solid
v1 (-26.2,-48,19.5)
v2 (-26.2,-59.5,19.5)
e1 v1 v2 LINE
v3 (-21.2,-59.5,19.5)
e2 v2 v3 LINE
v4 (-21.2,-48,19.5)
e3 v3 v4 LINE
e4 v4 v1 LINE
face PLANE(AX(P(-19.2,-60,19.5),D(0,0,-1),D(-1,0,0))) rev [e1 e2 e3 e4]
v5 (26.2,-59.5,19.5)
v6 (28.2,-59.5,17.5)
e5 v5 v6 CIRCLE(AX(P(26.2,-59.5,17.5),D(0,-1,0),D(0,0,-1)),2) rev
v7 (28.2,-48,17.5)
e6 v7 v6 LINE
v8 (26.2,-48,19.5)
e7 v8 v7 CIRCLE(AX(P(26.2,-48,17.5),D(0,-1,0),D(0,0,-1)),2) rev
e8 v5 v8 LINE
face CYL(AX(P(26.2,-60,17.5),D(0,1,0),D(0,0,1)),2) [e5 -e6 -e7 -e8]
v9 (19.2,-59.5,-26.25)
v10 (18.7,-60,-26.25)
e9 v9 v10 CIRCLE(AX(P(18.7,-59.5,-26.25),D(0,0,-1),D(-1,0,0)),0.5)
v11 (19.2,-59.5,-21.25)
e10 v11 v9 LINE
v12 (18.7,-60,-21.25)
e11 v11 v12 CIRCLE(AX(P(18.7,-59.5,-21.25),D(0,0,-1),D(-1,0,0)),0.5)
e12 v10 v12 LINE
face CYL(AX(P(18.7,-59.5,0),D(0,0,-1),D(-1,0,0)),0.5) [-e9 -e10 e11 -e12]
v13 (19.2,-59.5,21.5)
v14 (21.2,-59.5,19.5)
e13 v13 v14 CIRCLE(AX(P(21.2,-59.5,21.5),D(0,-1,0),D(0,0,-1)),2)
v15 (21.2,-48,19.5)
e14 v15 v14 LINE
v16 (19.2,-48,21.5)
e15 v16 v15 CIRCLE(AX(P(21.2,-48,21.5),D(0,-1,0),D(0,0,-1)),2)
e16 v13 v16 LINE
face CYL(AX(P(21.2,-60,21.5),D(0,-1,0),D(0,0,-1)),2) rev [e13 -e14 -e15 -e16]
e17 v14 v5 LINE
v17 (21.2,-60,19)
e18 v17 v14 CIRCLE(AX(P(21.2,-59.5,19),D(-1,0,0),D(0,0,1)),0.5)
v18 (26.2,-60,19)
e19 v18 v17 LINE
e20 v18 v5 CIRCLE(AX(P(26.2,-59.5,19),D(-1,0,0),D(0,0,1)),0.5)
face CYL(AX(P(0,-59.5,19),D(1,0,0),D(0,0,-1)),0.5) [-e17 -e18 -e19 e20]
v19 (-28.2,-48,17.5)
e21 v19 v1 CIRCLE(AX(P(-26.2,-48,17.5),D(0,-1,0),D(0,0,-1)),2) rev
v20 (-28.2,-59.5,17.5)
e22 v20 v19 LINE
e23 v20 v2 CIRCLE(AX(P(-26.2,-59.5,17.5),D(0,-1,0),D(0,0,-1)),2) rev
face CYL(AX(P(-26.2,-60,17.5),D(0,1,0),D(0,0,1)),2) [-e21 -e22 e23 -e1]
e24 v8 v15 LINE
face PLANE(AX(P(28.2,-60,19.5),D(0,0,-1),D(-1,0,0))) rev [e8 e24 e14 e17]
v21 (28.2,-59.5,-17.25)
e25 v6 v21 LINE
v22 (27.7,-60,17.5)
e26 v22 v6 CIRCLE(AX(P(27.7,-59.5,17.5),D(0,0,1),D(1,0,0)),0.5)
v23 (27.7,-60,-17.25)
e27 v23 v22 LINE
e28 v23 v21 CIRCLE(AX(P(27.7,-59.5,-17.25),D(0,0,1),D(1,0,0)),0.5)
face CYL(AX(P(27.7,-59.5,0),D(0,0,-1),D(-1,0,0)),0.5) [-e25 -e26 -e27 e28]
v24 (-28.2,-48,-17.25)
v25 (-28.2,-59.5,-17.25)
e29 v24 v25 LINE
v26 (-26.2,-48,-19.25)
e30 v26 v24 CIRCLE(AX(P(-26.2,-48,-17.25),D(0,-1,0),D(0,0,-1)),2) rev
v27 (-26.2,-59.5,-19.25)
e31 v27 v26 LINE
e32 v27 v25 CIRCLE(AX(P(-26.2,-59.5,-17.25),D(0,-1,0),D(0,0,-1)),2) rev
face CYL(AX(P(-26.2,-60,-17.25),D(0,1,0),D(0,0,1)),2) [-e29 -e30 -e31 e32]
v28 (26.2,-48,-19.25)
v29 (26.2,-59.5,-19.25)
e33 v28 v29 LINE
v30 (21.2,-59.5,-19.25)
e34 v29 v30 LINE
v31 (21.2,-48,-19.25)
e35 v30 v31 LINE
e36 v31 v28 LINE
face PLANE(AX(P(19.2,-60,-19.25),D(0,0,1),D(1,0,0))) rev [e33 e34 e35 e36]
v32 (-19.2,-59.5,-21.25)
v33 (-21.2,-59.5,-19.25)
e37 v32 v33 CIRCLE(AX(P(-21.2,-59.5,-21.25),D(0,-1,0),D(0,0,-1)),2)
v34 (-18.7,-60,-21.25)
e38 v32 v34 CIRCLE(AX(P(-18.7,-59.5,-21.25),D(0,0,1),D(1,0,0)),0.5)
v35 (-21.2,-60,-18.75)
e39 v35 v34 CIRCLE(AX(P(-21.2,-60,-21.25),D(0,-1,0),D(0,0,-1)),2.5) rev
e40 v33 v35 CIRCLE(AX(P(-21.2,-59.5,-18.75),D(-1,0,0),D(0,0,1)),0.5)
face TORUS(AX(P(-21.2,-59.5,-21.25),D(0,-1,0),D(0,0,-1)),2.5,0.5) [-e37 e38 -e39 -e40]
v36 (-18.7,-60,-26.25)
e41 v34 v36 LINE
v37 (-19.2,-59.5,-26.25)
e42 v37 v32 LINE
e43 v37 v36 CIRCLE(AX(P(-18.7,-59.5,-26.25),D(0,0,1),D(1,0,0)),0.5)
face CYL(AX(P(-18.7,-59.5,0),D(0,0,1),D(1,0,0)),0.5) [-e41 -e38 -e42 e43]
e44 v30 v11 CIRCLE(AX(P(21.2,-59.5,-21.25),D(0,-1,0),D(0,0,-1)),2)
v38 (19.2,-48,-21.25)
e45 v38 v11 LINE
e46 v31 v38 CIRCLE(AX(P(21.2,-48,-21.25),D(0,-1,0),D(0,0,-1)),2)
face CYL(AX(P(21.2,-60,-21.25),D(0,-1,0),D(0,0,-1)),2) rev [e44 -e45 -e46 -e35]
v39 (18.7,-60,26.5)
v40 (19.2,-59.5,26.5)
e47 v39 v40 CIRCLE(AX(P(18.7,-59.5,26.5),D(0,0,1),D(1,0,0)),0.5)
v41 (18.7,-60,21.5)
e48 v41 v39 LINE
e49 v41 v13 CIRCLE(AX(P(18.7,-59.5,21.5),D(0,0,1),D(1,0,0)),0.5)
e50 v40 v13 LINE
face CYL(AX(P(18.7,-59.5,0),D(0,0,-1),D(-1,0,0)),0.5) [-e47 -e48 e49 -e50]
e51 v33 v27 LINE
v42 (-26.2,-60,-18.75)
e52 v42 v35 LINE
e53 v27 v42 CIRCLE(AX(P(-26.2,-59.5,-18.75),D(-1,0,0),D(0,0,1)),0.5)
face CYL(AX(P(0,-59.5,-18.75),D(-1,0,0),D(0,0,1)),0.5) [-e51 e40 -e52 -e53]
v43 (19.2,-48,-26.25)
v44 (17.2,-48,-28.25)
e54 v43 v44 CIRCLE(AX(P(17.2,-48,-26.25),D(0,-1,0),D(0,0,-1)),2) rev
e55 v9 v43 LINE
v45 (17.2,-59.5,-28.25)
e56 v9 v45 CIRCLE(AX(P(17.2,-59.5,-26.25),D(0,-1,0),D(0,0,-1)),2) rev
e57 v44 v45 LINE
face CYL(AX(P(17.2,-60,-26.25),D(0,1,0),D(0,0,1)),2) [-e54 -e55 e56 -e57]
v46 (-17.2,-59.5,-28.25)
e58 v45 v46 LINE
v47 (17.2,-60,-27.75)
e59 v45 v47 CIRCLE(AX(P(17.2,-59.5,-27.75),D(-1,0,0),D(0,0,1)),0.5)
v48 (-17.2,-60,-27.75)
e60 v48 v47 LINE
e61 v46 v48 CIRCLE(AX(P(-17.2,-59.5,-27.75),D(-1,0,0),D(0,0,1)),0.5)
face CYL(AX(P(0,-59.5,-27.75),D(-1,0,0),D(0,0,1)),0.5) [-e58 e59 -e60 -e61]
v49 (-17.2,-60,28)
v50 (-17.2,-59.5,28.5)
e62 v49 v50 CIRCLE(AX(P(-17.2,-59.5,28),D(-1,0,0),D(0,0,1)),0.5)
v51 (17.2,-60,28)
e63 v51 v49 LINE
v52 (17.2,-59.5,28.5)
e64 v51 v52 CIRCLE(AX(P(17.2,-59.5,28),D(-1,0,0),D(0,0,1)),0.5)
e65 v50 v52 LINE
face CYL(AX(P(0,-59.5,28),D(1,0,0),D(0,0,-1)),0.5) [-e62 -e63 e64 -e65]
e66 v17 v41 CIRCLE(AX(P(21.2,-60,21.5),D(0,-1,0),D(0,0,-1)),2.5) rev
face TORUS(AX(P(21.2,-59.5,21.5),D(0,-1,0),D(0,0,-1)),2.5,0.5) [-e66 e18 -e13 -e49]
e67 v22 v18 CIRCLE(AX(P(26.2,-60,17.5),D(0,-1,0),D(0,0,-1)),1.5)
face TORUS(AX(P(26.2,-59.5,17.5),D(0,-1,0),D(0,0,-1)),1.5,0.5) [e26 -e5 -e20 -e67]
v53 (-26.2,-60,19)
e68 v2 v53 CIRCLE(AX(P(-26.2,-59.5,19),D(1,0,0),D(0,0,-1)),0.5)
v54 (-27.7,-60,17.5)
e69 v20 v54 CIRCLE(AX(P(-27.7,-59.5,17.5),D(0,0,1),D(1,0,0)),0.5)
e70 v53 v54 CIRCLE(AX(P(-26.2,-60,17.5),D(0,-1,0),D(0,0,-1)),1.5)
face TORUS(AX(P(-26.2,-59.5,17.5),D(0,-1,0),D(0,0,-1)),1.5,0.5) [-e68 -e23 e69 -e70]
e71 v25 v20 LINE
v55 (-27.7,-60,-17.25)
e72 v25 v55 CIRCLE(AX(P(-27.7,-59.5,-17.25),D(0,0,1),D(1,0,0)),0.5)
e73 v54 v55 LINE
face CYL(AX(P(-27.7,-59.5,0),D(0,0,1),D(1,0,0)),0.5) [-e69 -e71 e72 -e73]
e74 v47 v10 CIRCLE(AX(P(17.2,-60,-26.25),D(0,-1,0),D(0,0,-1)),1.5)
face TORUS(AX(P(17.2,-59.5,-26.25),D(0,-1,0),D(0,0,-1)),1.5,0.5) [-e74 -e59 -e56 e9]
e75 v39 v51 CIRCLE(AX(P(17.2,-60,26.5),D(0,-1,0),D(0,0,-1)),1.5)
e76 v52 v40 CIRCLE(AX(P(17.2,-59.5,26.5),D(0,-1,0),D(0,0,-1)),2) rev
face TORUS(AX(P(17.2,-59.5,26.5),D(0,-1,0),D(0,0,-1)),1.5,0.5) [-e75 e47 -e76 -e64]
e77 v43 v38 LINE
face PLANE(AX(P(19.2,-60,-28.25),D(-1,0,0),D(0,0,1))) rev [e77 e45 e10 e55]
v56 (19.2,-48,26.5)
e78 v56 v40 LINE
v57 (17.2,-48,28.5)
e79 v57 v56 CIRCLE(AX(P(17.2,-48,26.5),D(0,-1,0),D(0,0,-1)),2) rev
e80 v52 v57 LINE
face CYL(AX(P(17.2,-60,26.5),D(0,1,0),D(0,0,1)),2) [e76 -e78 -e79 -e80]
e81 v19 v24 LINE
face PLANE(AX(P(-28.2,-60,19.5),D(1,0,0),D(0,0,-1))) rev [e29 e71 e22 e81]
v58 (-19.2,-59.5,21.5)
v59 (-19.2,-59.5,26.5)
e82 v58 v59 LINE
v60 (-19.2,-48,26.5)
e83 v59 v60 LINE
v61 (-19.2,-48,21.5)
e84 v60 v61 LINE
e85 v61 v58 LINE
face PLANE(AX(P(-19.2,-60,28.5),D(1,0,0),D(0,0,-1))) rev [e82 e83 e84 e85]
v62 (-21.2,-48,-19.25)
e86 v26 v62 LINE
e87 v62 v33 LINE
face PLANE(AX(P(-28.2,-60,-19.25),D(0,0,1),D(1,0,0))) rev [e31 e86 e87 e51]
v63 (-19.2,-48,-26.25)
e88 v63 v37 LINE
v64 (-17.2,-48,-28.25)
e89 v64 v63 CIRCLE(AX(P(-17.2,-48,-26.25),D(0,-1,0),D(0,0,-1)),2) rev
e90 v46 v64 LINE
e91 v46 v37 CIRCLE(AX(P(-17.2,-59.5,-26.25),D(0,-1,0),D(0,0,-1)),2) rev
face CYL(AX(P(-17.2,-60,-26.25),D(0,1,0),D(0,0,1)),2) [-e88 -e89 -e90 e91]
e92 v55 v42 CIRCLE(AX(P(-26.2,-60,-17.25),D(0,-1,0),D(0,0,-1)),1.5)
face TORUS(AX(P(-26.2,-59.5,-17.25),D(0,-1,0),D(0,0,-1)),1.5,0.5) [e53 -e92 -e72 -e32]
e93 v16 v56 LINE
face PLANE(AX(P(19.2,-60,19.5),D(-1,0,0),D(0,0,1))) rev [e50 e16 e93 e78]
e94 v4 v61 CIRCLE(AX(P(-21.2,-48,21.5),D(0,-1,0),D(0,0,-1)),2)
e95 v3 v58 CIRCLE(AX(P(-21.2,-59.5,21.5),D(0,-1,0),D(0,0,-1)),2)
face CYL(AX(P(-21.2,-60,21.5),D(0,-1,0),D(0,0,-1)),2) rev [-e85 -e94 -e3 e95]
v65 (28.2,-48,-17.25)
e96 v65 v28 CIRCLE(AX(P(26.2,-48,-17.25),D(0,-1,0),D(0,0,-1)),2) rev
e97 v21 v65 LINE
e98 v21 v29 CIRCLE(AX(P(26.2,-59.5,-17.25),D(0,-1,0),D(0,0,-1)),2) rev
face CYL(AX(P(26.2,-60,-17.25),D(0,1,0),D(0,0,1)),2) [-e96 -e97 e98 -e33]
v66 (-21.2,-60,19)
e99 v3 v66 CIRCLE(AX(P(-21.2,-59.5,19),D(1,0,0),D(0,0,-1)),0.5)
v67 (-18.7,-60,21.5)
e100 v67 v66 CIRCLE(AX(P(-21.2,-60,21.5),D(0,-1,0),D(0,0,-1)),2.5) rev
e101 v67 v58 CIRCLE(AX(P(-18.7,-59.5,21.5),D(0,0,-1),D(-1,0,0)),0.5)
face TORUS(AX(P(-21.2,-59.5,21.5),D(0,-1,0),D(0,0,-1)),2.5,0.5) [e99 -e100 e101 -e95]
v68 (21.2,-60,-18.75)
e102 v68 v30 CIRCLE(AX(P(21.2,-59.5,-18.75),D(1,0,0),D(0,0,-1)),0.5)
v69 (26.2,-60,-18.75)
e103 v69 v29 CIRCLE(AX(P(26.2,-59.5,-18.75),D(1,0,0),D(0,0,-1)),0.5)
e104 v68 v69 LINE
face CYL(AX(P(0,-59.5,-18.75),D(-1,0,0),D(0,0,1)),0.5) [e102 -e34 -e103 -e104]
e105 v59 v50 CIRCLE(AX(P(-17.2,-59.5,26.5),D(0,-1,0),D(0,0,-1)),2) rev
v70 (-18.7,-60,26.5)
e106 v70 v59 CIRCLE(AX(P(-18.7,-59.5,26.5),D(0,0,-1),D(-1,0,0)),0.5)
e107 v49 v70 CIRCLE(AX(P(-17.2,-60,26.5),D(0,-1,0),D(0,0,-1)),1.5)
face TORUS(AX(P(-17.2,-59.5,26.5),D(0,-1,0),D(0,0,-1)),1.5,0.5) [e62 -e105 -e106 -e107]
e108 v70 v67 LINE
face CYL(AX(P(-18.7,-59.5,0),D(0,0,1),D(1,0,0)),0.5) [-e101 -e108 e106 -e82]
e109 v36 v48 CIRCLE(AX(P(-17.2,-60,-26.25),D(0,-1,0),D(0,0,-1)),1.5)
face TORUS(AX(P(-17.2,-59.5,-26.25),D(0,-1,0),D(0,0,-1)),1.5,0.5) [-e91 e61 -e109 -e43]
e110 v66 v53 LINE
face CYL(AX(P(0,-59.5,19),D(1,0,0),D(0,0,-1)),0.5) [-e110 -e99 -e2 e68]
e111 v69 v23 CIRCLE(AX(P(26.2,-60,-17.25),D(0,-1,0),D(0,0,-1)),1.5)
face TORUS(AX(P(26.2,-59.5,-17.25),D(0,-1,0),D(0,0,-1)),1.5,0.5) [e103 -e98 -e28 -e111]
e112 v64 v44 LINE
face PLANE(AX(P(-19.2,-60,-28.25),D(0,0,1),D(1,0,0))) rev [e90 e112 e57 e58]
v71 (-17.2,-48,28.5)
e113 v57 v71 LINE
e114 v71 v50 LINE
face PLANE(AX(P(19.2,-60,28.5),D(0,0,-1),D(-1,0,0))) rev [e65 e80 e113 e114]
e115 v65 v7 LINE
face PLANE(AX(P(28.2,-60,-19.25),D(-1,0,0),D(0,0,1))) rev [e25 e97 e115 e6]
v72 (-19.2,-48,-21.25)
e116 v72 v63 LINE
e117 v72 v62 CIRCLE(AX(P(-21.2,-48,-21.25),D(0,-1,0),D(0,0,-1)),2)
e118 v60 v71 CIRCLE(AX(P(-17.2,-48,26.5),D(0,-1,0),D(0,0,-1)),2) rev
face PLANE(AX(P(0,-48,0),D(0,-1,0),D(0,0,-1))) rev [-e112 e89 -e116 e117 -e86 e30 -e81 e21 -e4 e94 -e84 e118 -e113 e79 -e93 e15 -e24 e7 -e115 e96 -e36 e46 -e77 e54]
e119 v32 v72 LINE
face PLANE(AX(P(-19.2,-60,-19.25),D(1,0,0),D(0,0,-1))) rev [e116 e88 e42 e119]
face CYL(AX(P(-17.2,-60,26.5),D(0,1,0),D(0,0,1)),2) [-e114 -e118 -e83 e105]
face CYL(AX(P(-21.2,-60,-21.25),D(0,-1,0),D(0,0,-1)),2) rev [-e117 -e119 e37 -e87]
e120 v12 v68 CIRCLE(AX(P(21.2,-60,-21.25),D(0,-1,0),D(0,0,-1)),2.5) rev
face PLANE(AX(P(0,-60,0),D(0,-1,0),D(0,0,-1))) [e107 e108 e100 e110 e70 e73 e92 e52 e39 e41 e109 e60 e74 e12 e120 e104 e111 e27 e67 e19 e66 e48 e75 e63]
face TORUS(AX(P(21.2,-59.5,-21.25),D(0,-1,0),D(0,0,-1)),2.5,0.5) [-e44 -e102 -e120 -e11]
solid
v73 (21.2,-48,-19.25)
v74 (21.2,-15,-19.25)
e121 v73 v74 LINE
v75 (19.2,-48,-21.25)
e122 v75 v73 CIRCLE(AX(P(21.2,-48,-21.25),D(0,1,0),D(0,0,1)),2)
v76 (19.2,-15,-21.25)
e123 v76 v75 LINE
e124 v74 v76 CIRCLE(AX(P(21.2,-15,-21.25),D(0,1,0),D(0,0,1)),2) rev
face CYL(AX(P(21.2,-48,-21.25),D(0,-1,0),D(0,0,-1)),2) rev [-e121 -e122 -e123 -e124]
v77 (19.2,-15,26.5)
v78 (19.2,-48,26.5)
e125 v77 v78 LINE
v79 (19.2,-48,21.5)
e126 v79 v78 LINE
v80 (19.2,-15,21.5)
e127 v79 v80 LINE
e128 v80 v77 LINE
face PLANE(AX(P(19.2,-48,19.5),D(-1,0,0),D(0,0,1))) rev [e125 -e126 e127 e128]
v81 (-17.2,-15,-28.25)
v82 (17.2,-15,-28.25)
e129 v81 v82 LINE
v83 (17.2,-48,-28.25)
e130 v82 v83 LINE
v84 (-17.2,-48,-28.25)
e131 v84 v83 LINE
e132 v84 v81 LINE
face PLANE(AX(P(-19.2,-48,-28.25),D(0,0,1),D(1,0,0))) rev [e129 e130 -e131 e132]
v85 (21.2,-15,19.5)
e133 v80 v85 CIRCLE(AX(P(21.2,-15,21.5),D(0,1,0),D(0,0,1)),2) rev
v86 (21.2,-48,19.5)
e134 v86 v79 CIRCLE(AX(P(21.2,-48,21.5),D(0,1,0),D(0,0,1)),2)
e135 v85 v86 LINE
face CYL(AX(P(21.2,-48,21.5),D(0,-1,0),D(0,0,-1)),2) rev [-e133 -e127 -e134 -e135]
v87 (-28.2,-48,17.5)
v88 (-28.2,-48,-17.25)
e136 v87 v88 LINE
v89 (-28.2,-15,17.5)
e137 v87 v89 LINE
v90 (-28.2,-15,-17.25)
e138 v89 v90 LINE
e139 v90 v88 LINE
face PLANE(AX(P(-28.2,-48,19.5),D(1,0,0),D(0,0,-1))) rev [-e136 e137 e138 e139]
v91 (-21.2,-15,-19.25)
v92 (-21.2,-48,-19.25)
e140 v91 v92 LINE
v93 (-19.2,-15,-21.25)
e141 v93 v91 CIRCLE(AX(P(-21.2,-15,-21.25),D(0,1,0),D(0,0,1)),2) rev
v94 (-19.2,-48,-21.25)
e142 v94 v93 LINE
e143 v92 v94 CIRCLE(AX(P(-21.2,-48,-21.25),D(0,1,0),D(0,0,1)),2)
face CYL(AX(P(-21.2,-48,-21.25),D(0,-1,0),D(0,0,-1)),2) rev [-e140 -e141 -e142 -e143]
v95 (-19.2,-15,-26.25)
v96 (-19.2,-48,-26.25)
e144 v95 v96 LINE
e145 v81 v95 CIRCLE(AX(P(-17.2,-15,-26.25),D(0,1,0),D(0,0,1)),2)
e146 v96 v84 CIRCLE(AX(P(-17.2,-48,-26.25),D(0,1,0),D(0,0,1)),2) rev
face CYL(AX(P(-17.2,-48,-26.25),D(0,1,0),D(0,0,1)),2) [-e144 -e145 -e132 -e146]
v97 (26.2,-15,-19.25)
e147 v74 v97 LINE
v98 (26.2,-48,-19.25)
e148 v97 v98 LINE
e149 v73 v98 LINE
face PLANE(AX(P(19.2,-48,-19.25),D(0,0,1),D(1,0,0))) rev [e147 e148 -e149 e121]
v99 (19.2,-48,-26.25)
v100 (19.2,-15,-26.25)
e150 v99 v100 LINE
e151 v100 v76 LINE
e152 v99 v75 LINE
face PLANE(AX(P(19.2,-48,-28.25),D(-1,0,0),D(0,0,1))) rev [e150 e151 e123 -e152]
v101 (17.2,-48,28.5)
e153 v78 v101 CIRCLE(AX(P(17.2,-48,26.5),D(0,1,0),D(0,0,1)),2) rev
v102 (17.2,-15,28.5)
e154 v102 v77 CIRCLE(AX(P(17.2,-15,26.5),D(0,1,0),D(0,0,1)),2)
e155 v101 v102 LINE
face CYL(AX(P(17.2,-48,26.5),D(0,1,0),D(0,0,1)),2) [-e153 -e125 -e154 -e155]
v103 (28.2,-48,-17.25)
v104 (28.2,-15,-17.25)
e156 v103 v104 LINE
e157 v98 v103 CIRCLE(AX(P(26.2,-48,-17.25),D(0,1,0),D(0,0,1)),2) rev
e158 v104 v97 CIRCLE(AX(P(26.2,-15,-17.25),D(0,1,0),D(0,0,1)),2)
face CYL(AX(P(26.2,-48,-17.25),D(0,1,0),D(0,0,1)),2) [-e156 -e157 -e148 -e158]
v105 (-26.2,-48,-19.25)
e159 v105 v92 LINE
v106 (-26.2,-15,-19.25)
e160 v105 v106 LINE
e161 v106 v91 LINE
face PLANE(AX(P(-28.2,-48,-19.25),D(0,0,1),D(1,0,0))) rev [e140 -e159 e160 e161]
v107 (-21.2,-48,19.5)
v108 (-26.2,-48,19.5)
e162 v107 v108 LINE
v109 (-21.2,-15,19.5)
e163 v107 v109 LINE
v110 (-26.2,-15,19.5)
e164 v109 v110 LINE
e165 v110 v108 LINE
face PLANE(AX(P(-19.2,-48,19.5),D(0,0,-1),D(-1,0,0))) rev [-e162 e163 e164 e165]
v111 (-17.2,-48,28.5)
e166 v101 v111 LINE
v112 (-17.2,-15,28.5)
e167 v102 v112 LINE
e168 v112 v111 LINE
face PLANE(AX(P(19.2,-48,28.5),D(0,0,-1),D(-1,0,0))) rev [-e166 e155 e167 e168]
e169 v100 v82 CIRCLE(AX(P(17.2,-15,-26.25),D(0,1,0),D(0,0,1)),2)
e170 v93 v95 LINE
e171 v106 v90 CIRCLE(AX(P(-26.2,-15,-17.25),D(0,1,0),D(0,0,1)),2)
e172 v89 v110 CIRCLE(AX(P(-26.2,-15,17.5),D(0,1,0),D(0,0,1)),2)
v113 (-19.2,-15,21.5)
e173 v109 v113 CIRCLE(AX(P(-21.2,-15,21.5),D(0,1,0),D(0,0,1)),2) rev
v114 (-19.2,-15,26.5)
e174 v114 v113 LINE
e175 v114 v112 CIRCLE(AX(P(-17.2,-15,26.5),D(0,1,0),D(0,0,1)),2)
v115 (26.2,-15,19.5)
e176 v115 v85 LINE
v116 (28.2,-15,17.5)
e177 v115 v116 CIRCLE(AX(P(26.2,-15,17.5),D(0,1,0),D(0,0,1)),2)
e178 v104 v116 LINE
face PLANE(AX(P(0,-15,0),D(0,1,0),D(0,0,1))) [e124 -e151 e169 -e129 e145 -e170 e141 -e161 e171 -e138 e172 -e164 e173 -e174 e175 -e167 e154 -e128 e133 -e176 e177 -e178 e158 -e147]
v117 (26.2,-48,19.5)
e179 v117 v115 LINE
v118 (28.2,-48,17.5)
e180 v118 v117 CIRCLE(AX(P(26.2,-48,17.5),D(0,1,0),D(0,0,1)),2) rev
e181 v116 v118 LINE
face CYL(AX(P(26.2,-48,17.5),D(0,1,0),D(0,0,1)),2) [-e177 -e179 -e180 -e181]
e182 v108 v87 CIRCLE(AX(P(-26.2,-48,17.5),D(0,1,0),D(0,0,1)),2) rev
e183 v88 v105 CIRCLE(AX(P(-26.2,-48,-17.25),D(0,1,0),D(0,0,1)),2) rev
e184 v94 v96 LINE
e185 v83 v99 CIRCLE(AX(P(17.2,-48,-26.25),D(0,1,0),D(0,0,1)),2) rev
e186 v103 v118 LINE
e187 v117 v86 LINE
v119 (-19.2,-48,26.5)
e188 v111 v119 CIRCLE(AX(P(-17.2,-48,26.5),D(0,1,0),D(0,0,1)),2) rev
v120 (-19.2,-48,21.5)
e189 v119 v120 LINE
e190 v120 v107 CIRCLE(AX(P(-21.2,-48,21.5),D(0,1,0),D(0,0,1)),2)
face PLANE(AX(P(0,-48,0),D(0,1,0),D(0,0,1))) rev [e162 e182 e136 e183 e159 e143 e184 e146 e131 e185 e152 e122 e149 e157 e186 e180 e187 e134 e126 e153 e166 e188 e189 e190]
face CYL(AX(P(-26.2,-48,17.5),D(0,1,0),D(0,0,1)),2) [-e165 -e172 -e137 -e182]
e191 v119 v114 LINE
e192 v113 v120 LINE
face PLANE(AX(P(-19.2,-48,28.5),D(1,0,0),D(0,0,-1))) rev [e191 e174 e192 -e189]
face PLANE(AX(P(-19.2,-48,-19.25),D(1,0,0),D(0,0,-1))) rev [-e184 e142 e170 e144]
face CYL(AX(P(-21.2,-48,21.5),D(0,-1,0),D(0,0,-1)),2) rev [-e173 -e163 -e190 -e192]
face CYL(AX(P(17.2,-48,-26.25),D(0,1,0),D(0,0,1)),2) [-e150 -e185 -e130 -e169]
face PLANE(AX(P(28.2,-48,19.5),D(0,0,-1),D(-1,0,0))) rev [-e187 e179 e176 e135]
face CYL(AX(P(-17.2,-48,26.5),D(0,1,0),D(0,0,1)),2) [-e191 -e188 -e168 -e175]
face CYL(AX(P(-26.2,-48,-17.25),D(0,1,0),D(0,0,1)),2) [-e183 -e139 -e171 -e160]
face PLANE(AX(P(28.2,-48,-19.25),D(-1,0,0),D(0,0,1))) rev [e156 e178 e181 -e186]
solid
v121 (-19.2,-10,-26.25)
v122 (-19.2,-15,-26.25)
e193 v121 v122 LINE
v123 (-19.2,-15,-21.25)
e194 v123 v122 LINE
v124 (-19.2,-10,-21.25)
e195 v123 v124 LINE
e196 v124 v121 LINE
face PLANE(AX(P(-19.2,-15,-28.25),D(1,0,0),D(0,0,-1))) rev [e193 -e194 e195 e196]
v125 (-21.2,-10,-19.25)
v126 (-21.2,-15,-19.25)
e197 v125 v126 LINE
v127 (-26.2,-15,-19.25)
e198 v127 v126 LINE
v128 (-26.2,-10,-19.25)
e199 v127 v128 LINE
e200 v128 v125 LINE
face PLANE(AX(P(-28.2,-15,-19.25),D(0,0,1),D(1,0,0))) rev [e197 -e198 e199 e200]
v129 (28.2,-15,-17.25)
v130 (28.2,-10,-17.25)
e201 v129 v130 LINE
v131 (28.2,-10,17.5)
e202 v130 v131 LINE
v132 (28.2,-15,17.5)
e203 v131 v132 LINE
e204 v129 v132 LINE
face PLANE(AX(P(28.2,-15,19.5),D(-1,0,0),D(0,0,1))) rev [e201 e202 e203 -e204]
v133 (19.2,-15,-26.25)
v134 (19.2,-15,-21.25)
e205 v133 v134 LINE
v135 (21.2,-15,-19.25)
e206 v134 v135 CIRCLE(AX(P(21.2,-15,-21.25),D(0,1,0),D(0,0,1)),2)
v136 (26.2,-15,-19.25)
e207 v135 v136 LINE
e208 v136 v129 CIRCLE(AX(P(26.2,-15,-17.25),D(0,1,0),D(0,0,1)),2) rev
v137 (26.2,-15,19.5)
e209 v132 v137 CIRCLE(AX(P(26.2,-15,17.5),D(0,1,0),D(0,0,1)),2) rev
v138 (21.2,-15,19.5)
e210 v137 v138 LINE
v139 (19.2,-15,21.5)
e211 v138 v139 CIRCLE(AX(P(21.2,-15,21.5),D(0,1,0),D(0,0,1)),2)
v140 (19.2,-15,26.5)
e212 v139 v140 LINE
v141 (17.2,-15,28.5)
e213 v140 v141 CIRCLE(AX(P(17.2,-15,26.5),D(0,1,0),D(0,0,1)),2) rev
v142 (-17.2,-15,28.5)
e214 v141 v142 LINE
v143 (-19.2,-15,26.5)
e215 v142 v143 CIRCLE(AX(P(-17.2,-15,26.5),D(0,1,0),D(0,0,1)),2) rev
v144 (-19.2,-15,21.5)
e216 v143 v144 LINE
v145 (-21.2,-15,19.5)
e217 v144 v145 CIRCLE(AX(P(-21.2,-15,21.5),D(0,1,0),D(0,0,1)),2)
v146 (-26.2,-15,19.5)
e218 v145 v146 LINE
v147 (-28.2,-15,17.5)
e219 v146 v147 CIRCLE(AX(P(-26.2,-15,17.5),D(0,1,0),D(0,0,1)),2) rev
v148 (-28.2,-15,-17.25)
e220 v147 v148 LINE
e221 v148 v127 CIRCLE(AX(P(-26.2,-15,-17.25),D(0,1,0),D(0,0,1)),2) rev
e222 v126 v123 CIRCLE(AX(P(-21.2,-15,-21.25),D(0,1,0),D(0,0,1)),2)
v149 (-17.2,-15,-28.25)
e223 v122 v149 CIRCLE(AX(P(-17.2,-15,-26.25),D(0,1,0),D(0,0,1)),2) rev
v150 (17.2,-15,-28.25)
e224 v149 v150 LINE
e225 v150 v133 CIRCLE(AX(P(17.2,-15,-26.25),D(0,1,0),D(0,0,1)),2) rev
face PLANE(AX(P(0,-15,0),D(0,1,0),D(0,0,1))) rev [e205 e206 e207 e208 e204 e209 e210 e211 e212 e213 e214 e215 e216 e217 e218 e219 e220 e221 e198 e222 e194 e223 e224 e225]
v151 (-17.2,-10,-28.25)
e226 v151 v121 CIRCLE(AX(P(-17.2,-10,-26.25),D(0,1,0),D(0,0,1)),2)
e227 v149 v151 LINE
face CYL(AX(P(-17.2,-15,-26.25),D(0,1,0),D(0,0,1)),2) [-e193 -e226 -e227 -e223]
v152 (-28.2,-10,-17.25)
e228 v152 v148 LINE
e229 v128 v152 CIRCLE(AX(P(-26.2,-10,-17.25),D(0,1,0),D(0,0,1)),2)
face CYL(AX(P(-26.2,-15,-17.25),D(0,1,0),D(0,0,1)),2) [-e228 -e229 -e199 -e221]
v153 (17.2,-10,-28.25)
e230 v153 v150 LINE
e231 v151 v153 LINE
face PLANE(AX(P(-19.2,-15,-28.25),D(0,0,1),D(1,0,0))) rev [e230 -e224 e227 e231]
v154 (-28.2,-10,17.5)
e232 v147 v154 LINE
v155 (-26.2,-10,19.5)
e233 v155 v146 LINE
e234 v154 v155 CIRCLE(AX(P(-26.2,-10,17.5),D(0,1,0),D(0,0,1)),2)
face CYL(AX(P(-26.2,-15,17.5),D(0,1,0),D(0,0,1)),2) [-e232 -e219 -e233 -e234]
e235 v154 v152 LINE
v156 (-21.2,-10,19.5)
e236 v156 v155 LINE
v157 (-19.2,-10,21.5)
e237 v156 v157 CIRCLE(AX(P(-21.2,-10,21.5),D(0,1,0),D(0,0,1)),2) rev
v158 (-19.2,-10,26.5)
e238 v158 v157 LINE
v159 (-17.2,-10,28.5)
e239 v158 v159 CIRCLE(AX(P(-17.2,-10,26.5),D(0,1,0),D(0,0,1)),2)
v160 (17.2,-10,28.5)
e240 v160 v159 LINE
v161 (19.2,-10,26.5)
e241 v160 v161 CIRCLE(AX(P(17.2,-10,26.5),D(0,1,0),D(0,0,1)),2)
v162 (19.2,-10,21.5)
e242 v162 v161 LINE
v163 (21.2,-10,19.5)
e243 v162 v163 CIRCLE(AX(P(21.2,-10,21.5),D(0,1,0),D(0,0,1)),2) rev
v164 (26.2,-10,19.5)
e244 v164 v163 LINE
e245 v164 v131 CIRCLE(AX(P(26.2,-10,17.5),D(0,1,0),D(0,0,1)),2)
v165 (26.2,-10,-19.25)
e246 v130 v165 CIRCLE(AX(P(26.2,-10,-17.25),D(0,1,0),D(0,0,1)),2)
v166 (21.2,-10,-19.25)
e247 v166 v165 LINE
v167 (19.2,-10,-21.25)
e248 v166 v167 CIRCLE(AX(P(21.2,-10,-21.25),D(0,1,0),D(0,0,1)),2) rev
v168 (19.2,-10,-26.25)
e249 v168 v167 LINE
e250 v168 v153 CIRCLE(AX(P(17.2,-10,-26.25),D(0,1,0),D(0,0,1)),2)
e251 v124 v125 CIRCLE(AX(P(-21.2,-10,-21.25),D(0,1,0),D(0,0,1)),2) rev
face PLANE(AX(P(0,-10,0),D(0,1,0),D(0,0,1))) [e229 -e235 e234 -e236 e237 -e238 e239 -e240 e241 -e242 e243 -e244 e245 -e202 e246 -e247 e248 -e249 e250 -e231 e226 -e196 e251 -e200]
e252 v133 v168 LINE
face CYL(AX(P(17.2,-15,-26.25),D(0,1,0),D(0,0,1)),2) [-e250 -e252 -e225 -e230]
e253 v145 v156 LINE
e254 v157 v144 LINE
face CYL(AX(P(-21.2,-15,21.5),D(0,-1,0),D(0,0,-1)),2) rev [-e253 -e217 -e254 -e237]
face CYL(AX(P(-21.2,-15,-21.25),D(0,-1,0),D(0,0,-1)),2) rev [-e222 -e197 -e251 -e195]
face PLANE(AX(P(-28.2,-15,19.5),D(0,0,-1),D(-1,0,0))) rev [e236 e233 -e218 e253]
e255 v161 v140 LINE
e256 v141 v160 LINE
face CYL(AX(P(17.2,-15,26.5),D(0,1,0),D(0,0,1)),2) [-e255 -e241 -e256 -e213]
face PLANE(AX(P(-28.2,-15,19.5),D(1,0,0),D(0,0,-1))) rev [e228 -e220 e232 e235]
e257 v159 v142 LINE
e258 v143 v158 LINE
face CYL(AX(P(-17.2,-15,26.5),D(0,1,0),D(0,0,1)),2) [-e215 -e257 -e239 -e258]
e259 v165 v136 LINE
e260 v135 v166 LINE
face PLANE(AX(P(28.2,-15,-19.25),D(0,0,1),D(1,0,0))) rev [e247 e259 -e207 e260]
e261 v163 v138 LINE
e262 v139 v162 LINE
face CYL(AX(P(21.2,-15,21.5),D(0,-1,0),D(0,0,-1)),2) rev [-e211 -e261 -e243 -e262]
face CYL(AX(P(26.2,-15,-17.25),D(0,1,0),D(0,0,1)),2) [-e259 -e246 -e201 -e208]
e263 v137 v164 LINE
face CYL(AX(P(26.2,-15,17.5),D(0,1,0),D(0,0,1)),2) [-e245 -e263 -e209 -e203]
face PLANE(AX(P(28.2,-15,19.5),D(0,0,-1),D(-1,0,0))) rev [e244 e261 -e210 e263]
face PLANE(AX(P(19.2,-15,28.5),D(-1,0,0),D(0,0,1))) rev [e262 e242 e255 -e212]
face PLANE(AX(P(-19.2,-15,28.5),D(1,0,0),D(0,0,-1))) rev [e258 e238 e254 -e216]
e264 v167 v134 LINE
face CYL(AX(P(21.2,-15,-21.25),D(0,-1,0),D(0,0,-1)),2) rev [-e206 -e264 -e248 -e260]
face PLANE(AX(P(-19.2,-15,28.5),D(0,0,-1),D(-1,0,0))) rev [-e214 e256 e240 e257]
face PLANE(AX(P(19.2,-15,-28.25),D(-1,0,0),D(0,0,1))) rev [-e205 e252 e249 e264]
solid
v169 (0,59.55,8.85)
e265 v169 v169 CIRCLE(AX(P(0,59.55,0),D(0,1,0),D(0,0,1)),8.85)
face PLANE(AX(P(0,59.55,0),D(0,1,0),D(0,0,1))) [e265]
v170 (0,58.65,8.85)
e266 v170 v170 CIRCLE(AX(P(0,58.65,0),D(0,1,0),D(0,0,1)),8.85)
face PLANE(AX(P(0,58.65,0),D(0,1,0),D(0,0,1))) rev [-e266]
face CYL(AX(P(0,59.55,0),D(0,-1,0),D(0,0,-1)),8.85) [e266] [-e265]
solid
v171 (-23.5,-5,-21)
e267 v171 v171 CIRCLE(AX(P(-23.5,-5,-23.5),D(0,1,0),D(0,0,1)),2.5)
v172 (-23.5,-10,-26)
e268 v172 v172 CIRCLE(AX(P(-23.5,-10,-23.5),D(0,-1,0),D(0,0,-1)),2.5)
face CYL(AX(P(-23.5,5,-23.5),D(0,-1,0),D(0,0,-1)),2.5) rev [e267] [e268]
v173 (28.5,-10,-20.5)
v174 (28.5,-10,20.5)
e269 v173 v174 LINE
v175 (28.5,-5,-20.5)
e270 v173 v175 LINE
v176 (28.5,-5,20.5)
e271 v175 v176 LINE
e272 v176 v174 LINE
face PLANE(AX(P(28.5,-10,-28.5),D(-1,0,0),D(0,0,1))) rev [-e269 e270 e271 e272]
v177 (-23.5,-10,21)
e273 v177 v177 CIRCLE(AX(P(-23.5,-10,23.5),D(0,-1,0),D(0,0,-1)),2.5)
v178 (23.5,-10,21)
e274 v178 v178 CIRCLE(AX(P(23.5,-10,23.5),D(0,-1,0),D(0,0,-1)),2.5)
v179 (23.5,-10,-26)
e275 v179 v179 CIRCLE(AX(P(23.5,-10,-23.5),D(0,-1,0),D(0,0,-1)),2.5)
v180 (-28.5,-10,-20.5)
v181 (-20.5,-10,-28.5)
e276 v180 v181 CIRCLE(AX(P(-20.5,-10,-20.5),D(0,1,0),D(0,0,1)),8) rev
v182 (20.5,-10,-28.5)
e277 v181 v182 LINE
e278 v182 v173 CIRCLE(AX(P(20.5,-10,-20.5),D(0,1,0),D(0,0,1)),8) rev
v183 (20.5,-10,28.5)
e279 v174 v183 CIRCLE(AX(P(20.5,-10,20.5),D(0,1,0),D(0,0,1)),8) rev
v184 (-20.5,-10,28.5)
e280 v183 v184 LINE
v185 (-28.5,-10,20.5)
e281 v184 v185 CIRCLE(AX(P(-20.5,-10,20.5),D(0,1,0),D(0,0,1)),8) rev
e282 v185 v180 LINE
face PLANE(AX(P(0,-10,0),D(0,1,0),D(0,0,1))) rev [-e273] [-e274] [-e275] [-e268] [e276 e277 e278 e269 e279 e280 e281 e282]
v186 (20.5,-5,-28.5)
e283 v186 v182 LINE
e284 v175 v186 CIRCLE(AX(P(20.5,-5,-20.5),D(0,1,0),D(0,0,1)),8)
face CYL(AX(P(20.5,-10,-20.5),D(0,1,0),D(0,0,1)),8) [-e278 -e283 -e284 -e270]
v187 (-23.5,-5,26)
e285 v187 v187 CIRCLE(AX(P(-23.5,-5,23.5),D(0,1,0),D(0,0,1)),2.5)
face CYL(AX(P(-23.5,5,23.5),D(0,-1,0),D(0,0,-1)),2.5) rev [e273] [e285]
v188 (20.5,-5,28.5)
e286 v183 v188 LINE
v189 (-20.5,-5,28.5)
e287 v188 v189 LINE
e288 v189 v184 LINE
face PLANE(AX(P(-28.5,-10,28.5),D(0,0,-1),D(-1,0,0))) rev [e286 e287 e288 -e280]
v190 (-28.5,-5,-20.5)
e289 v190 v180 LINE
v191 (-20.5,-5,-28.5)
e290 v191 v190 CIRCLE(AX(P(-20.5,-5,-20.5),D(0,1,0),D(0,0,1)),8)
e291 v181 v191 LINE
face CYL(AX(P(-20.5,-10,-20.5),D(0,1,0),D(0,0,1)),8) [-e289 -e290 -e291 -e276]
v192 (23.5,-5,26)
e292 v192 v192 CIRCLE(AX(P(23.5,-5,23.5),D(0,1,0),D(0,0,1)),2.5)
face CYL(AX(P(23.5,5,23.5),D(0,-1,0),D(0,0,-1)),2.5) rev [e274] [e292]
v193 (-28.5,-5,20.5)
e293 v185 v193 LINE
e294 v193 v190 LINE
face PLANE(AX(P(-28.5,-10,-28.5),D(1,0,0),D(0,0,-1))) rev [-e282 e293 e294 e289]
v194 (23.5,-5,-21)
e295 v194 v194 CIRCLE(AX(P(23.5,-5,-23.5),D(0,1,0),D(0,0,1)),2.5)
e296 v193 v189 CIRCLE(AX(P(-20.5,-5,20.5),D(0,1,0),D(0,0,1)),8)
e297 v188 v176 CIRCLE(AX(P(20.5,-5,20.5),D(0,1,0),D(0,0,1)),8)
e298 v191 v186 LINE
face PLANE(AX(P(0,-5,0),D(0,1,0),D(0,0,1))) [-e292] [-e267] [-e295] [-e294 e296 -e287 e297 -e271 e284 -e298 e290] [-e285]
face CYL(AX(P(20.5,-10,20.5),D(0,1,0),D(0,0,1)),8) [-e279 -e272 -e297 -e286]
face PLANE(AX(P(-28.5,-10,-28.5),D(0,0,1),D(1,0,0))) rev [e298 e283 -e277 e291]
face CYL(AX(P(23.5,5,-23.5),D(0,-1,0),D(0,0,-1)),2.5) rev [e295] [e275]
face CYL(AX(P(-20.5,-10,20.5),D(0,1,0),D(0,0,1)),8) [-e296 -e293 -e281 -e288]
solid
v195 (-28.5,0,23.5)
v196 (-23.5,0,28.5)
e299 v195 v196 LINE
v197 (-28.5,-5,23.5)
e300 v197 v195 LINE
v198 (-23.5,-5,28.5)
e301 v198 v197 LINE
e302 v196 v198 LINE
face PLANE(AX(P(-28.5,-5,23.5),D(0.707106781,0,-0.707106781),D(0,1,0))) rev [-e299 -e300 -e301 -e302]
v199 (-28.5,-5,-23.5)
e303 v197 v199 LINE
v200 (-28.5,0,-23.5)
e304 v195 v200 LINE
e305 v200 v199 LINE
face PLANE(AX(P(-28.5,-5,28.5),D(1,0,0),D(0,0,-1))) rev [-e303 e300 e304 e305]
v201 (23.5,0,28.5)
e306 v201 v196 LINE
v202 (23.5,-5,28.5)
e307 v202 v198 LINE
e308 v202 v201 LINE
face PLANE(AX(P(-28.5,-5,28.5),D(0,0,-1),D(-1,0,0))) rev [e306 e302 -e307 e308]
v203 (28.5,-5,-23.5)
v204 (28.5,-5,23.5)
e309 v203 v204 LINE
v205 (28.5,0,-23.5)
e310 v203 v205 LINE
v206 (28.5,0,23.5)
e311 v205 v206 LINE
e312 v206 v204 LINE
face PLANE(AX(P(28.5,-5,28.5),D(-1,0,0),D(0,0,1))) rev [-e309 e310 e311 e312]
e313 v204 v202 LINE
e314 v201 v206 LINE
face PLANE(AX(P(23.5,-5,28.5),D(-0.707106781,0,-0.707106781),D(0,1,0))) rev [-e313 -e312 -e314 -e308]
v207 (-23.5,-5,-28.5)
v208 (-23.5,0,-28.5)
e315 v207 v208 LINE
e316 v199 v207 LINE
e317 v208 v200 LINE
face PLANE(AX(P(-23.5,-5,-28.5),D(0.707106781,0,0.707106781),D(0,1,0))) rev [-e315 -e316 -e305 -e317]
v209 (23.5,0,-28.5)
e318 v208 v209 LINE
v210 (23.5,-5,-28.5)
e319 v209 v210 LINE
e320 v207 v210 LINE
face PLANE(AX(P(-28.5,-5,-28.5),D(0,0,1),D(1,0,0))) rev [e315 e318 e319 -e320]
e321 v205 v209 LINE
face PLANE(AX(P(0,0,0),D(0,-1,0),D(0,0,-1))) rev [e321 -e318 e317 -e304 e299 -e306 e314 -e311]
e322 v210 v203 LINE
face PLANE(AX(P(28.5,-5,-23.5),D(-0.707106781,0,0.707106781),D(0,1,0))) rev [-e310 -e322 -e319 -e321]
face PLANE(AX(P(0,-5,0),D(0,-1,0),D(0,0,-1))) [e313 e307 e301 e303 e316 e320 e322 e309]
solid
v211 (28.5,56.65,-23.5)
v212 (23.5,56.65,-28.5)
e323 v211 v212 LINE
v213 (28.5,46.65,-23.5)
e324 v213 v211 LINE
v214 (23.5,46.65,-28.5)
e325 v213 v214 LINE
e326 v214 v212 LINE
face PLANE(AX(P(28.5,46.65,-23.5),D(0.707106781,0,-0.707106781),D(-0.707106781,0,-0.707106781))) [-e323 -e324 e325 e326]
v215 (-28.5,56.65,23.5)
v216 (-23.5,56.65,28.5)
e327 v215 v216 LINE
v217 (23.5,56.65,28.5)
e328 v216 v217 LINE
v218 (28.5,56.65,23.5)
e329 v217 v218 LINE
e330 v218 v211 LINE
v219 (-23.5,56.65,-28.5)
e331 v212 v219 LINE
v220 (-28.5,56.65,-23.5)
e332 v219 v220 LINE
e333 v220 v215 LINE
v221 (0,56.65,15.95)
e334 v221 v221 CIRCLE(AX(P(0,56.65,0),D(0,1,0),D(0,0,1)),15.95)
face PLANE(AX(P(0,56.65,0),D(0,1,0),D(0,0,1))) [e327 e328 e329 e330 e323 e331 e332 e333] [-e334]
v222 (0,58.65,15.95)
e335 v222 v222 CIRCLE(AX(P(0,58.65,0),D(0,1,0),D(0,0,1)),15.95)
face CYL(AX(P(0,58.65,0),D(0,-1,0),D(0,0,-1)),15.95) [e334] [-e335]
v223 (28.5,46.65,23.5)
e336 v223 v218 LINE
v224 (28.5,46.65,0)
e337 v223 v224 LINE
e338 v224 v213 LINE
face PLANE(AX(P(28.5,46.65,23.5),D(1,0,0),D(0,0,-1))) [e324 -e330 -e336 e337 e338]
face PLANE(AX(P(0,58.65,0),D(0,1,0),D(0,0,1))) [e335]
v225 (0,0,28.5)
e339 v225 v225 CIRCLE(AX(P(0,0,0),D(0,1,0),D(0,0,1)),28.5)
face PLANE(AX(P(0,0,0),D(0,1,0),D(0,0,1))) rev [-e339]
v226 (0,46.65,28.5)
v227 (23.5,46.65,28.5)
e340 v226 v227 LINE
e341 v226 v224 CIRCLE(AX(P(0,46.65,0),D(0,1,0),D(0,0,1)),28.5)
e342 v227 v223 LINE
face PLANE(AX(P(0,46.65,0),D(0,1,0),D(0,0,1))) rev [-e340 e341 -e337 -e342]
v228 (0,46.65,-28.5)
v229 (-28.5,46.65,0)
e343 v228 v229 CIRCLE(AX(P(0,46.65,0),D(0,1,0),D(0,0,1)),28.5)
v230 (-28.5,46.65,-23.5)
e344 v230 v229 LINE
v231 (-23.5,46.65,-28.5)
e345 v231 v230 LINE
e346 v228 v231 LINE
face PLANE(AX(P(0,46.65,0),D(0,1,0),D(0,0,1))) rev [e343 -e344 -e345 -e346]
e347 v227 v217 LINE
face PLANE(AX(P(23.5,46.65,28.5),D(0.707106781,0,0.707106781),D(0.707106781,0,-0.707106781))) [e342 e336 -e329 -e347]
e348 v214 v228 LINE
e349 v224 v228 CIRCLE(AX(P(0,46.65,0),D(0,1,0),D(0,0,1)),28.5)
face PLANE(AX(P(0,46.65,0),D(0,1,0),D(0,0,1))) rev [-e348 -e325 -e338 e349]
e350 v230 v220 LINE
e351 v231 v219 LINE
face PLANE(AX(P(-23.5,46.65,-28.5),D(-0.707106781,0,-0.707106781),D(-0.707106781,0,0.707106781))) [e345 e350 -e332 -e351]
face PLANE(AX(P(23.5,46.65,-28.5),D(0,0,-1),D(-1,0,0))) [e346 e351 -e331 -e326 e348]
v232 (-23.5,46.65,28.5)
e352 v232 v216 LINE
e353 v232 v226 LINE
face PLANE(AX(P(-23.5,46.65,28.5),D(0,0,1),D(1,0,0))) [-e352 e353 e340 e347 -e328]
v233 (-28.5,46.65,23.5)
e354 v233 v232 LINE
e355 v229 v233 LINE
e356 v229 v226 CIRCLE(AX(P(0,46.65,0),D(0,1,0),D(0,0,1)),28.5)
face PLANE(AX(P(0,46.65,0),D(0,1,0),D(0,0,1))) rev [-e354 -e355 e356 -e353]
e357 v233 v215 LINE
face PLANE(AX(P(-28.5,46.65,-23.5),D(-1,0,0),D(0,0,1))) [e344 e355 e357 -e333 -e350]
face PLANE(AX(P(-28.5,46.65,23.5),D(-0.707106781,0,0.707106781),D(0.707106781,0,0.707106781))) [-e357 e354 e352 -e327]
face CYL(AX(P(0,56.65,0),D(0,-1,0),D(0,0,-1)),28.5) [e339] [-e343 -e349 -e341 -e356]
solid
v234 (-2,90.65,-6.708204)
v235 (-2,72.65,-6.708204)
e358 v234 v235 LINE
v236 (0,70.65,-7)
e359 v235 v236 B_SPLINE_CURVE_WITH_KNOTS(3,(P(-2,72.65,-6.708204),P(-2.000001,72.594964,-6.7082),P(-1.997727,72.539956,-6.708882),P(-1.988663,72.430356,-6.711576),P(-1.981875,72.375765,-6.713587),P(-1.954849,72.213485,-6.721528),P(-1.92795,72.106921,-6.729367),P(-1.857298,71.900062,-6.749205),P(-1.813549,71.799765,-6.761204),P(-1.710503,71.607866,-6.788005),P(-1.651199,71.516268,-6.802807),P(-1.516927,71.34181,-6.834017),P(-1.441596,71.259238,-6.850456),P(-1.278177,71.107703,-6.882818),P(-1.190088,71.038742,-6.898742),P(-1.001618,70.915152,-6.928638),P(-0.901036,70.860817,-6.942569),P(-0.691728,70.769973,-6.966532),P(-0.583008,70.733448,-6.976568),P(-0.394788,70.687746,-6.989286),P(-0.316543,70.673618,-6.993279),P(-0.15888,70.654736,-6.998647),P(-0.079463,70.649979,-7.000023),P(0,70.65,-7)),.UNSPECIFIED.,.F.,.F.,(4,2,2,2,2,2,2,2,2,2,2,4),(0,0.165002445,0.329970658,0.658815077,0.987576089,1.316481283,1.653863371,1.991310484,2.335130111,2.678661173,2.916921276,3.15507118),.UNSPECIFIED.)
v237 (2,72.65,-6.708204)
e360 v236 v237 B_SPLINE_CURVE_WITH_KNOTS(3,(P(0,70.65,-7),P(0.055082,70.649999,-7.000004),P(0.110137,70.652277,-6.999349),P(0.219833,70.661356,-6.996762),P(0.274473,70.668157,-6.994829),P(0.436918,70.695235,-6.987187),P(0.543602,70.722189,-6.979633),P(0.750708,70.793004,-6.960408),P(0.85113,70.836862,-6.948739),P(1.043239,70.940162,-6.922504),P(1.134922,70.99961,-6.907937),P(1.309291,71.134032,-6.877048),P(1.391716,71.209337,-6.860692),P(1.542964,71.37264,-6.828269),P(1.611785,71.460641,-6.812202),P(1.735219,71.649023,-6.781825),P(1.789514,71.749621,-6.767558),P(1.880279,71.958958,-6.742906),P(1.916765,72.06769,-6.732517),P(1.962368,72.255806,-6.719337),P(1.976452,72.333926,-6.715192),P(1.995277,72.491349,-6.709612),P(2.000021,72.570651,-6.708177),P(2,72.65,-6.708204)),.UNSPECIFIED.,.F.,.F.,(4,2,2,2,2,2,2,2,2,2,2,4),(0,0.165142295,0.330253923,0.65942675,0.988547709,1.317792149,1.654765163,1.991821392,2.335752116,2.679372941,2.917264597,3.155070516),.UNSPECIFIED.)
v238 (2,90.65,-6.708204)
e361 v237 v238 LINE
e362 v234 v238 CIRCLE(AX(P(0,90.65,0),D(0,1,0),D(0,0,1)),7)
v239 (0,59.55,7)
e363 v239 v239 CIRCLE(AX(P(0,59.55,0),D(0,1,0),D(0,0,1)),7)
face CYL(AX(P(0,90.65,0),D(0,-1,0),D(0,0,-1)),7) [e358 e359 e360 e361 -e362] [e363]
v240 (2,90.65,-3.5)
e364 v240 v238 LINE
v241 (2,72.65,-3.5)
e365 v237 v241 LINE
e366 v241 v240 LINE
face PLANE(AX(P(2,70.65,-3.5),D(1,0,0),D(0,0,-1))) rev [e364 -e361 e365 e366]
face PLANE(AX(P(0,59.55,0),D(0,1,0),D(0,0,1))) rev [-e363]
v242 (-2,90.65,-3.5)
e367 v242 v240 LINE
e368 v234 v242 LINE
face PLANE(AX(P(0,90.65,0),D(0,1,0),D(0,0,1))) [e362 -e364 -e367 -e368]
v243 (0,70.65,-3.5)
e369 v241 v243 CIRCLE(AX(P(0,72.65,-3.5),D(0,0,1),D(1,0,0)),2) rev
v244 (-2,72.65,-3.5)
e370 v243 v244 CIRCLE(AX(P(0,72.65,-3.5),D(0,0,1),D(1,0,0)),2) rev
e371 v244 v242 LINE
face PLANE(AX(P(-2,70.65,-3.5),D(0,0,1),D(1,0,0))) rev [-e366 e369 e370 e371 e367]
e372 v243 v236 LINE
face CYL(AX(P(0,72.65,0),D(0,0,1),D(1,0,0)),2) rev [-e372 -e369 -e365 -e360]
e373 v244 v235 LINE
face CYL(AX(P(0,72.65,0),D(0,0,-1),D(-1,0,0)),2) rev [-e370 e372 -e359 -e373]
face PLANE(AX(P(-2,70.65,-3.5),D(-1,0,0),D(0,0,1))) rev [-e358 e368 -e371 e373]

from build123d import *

# Parameters (mm, degrees)
SKETCH1_R            = 28.5
BOSS_EXTRUDE1_DEPTH  = 56.65
SKETCH2_W            = 57
SKETCH2_H            = 57
BOSS_EXTRUDE2_DEPTH  = 5
CHAMFER1_SIZE        = 5
SKETCH3_W            = 57
SKETCH3_H            = 57
BOSS_EXTRUDE3_DEPTH  = 5
SKETCH4_R            = 2.5
CUT_EXTRUDE1_DEPTH   = 15
BOSS_EXTRUDE4_DEPTH  = 5
BOSS_EXTRUDE5_DEPTH  = 33
BOSS_EXTRUDE6_DEPTH  = 12
FILLET1_R            = 2
FILLET2_R            = 2
FILLET3_R            = 2
FILLET4_R            = 0.5
FILLET5_R            = 8
SKETCH9_R            = 15.95
BOSS_EXTRUDE7_DEPTH  = 2
SKETCH10_R           = 8.85
BOSS_EXTRUDE8_DEPTH  = 0.9
SKETCH11_R           = 7
BOSS_EXTRUDE9_DEPTH  = 31.1
SKETCH12_W           = 4
SKETCH12_H           = 5.111692092
CUT_EXTRUDE2_DEPTH   = 20
FILLET6_R            = 2
BOSS_EXTRUDE10_DEPTH = 10


with BuildPart() as part:
    # Sketch1 → Boss-Extrude1 (new body)
    with BuildSketch(Plane(origin=(0, 0, 0), x_dir=(1, 0, 0), z_dir=(0, 1, 0))):
        with Locations(Location((0, 0, 0), (0, 0, 270))):
            Circle(SKETCH1_R)
    extrude(amount=BOSS_EXTRUDE1_DEPTH)

    # Sketch9 → Boss-Extrude7 (add)
    with BuildSketch(Plane(origin=(0, 56.65, 0), x_dir=(1, 0, 0), z_dir=(0, 1, 0))):
        with Locations(Location((0, 0, 0), (0, 0, 270))):
            Circle(SKETCH9_R)
    extrude(amount=BOSS_EXTRUDE7_DEPTH)

    # Sketch13 → Boss-Extrude10 (add)
    with BuildSketch(Plane(origin=(0, 56.65, 0), x_dir=(1, 0, 0), z_dir=(0, 1, 0))):
        Polygon((28.5, -23.5), (28.5, 23.5), (23.5, 28.5), (-23.5, 28.5), (-28.5, 23.5), (-28.5, -23.5), (-23.5, -28.5), (23.5, -28.5), align=None)
    extrude(amount=-BOSS_EXTRUDE10_DEPTH)


with BuildPart() as body_2:
    # Sketch2 → Boss-Extrude2 (new body)
    with BuildSketch(Plane.XZ):
        Rectangle(SKETCH2_W, SKETCH2_H)
    extrude(amount=BOSS_EXTRUDE2_DEPTH)

    # Chamfer1
    chamfer1_edges = [body_2.edges().sort_by_distance(p)[0] for p in [
        (28.5, -2.5, -28.5),
        (-28.5, -2.5, -28.5),
        (-28.5, -2.5, 28.5),
        (28.5, -2.5, 28.5),
    ]]
    chamfer(chamfer1_edges, length=CHAMFER1_SIZE)


with BuildPart() as body_3:
    # Sketch3 → Boss-Extrude3 (new body)
    with BuildSketch(Plane.XZ.offset(5)):
        Rectangle(SKETCH3_W, SKETCH3_H)
    extrude(amount=BOSS_EXTRUDE3_DEPTH)

    # Sketch4 → Cut-Extrude1 (cut)
    with BuildSketch(Plane.XZ.offset(10)):
        with Locations(Location((-23.5, 23.5, 0), (0, 0, 270))):
            Circle(SKETCH4_R)
        with Locations(Location((23.5, 23.5, 0), (0, 0, 270))):
            Circle(SKETCH4_R)
        with Locations(Location((23.5, -23.5, 0), (0, 0, 270))):
            Circle(SKETCH4_R)
        with Locations(Location((-23.5, -23.5, 0), (0, 0, 270))):
            Circle(SKETCH4_R)
    extrude(amount=-CUT_EXTRUDE1_DEPTH, mode=Mode.SUBTRACT)

    # Fillet5
    fillet5_edges = [body_3.edges().sort_by_distance(p)[0] for p in [
        (28.5, -7.5, -28.5),
        (-28.5, -7.5, -28.5),
        (-28.5, -7.5, 28.5),
        (28.5, -7.5, 28.5),
    ]]
    fillet(fillet5_edges, radius=FILLET5_R)


with BuildPart() as body_4:
    # Sketch6 → Boss-Extrude4 (new body)
    with BuildSketch(Plane.XZ.offset(10)):
        Polygon((-19.2, 28.5), (19.2, 28.5), (19.2, 19.5), (28.2, 19.5), (28.2, -19.25), (19.2, -19.25), (19.2, -28.25), (-19.2, -28.25), (-19.2, -19.25), (-28.2, -19.25), (-28.2, 19.5), (-19.2, 19.5), align=None)
    extrude(amount=BOSS_EXTRUDE4_DEPTH)

    # Fillet1
    fillet1_edges = [body_4.edges().sort_by_distance(p)[0] for p in [
        (19.2, -12.5, 19.5),
        (28.2, -12.5, 19.5),
        (28.2, -12.5, -19.25),
        (19.2, -12.5, -19.25),
        (19.2, -12.5, -28.25),
        (-19.2, -12.5, -28.25),
        (-19.2, -12.5, -19.25),
        (-28.2, -12.5, -19.25),
        (-28.2, -12.5, 19.5),
        (-19.2, -12.5, 19.5),
        (-19.2, -12.5, 28.5),
        (19.2, -12.5, 28.5),
    ]]
    fillet(fillet1_edges, radius=FILLET1_R)


with BuildPart() as body_5:
    # Sketch7 → Boss-Extrude5 (new body)
    with BuildSketch(Plane.XZ.offset(15)):
        Polygon((19.2, 19.5), (19.2, 28.5), (-19.2, 28.5), (-19.2, 19.5), (-28.2, 19.5), (-28.2, -19.25), (-19.2, -19.25), (-19.2, -28.25), (19.2, -28.25), (19.2, -19.25), (28.2, -19.25), (28.2, 19.5), align=None)
    extrude(amount=BOSS_EXTRUDE5_DEPTH)

    # Fillet2
    fillet2_edges = [body_5.edges().sort_by_distance(p)[0] for p in [
        (28.2, -31.5, 19.5),
        (28.2, -31.5, -19.25),
        (19.2, -31.5, -19.25),
        (19.2, -31.5, -28.25),
        (-19.2, -31.5, -28.25),
        (-19.2, -31.5, -19.25),
        (-28.2, -31.5, -19.25),
        (-28.2, -31.5, 19.5),
        (-19.2, -31.5, 19.5),
        (-19.2, -31.5, 28.5),
        (19.2, -31.5, 28.5),
        (19.2, -31.5, 19.5),
    ]]
    fillet(fillet2_edges, radius=FILLET2_R)


with BuildPart() as body_6:
    # Sketch8 → Boss-Extrude6 (new body)
    with BuildSketch(Plane.XZ.offset(48)):
        Polygon((28.2, 19.5), (19.2, 19.5), (19.2, 28.5), (-19.2, 28.5), (-19.2, 19.5), (-28.2, 19.5), (-28.2, -19.25), (-19.2, -19.25), (-19.2, -28.25), (19.2, -28.25), (19.2, -19.25), (28.2, -19.25), align=None)
    extrude(amount=BOSS_EXTRUDE6_DEPTH)

    # Fillet3
    fillet3_edges = [body_6.edges().sort_by_distance(p)[0] for p in [
        (28.2, -54, -19.25),
        (19.2, -54, -19.25),
        (19.2, -54, -28.25),
        (-19.2, -54, -28.25),
        (-19.2, -54, -19.25),
        (-28.2, -54, -19.25),
        (-28.2, -54, 19.5),
        (-19.2, -54, 19.5),
        (-19.2, -54, 28.5),
        (19.2, -54, 28.5),
        (19.2, -54, 19.5),
        (28.2, -54, 19.5),
    ]]
    fillet(fillet3_edges, radius=FILLET3_R)

    # Fillet4
    fillet4_edges = [body_6.edges().sort_by_distance(p)[0] for p in [
        (-28.2, -60, 0.125),
        (-23.7, -60, 19.5),
        (28.2, -60, 0.125),
        (23.7, -60, 19.5),
        (19.2, -60, 24),
        (0, -60, 28.5),
        (-19.2, -60, 24),
        (-23.7, -60, -19.25),
        (-19.2, -60, -23.75),
        (0, -60, -28.25),
        (19.2, -60, -23.75),
        (23.7, -60, -19.25),
        (-27.614213562, -60, -18.664213562),
        (-18.614213562, -60, -27.664213562),
        (18.614213562, -60, -27.664213562),
        (27.614213562, -60, -18.664213562),
        (27.614213562, -60, 18.914213562),
        (18.614213562, -60, 27.914213562),
        (-18.614213562, -60, 27.914213562),
        (-27.614213562, -60, 18.914213562),
        (-19.785786438, -60, 20.085786438),
        (19.785786438, -60, 20.085786438),
        (19.785786438, -60, -19.835786438),
        (-19.785786438, -60, -19.835786438),
    ]]
    fillet(fillet4_edges, radius=FILLET4_R)


with BuildPart() as body_7:
    # Sketch10 → Boss-Extrude8 (new body)
    with BuildSketch(Plane(origin=(0, 58.65, 0), x_dir=(1, 0, 0), z_dir=(0, 1, 0))):
        with Locations(Location((0, 0, 0), (0, 0, 270))):
            Circle(SKETCH10_R)
    extrude(amount=BOSS_EXTRUDE8_DEPTH)


with BuildPart() as body_8:
    # Sketch11 → Boss-Extrude9 (new body)
    with BuildSketch(Plane(origin=(0, 59.55, 0), x_dir=(1, 0, 0), z_dir=(0, 1, 0))):
        with Locations(Location((0, 0, 0), (0, 0, 90))):
            Circle(SKETCH11_R)
    extrude(amount=BOSS_EXTRUDE9_DEPTH)

    # Sketch12 → Cut-Extrude2 (cut)
    with BuildSketch(Plane(origin=(0, 90.65, 0), x_dir=(1, 0, 0), z_dir=(0, 1, 0))):
        with Locations((0, 6.055846046)):
            Rectangle(SKETCH12_W, SKETCH12_H)
    extrude(amount=-CUT_EXTRUDE2_DEPTH, mode=Mode.SUBTRACT)

    # Fillet6
    fillet6_edges = [body_8.edges().sort_by_distance(p)[0] for p in [
        (-2, 70.65, -5.104101966),
        (2, 70.65, -5.104101966),
    ]]
    fillet(fillet6_edges, radius=FILLET6_R - 0.0001)  # a hair under: the kernel refuses the full size


solid = Compound([part.part, body_2.part, body_3.part, body_4.part, body_5.part, body_6.part, body_7.part, body_8.part])
